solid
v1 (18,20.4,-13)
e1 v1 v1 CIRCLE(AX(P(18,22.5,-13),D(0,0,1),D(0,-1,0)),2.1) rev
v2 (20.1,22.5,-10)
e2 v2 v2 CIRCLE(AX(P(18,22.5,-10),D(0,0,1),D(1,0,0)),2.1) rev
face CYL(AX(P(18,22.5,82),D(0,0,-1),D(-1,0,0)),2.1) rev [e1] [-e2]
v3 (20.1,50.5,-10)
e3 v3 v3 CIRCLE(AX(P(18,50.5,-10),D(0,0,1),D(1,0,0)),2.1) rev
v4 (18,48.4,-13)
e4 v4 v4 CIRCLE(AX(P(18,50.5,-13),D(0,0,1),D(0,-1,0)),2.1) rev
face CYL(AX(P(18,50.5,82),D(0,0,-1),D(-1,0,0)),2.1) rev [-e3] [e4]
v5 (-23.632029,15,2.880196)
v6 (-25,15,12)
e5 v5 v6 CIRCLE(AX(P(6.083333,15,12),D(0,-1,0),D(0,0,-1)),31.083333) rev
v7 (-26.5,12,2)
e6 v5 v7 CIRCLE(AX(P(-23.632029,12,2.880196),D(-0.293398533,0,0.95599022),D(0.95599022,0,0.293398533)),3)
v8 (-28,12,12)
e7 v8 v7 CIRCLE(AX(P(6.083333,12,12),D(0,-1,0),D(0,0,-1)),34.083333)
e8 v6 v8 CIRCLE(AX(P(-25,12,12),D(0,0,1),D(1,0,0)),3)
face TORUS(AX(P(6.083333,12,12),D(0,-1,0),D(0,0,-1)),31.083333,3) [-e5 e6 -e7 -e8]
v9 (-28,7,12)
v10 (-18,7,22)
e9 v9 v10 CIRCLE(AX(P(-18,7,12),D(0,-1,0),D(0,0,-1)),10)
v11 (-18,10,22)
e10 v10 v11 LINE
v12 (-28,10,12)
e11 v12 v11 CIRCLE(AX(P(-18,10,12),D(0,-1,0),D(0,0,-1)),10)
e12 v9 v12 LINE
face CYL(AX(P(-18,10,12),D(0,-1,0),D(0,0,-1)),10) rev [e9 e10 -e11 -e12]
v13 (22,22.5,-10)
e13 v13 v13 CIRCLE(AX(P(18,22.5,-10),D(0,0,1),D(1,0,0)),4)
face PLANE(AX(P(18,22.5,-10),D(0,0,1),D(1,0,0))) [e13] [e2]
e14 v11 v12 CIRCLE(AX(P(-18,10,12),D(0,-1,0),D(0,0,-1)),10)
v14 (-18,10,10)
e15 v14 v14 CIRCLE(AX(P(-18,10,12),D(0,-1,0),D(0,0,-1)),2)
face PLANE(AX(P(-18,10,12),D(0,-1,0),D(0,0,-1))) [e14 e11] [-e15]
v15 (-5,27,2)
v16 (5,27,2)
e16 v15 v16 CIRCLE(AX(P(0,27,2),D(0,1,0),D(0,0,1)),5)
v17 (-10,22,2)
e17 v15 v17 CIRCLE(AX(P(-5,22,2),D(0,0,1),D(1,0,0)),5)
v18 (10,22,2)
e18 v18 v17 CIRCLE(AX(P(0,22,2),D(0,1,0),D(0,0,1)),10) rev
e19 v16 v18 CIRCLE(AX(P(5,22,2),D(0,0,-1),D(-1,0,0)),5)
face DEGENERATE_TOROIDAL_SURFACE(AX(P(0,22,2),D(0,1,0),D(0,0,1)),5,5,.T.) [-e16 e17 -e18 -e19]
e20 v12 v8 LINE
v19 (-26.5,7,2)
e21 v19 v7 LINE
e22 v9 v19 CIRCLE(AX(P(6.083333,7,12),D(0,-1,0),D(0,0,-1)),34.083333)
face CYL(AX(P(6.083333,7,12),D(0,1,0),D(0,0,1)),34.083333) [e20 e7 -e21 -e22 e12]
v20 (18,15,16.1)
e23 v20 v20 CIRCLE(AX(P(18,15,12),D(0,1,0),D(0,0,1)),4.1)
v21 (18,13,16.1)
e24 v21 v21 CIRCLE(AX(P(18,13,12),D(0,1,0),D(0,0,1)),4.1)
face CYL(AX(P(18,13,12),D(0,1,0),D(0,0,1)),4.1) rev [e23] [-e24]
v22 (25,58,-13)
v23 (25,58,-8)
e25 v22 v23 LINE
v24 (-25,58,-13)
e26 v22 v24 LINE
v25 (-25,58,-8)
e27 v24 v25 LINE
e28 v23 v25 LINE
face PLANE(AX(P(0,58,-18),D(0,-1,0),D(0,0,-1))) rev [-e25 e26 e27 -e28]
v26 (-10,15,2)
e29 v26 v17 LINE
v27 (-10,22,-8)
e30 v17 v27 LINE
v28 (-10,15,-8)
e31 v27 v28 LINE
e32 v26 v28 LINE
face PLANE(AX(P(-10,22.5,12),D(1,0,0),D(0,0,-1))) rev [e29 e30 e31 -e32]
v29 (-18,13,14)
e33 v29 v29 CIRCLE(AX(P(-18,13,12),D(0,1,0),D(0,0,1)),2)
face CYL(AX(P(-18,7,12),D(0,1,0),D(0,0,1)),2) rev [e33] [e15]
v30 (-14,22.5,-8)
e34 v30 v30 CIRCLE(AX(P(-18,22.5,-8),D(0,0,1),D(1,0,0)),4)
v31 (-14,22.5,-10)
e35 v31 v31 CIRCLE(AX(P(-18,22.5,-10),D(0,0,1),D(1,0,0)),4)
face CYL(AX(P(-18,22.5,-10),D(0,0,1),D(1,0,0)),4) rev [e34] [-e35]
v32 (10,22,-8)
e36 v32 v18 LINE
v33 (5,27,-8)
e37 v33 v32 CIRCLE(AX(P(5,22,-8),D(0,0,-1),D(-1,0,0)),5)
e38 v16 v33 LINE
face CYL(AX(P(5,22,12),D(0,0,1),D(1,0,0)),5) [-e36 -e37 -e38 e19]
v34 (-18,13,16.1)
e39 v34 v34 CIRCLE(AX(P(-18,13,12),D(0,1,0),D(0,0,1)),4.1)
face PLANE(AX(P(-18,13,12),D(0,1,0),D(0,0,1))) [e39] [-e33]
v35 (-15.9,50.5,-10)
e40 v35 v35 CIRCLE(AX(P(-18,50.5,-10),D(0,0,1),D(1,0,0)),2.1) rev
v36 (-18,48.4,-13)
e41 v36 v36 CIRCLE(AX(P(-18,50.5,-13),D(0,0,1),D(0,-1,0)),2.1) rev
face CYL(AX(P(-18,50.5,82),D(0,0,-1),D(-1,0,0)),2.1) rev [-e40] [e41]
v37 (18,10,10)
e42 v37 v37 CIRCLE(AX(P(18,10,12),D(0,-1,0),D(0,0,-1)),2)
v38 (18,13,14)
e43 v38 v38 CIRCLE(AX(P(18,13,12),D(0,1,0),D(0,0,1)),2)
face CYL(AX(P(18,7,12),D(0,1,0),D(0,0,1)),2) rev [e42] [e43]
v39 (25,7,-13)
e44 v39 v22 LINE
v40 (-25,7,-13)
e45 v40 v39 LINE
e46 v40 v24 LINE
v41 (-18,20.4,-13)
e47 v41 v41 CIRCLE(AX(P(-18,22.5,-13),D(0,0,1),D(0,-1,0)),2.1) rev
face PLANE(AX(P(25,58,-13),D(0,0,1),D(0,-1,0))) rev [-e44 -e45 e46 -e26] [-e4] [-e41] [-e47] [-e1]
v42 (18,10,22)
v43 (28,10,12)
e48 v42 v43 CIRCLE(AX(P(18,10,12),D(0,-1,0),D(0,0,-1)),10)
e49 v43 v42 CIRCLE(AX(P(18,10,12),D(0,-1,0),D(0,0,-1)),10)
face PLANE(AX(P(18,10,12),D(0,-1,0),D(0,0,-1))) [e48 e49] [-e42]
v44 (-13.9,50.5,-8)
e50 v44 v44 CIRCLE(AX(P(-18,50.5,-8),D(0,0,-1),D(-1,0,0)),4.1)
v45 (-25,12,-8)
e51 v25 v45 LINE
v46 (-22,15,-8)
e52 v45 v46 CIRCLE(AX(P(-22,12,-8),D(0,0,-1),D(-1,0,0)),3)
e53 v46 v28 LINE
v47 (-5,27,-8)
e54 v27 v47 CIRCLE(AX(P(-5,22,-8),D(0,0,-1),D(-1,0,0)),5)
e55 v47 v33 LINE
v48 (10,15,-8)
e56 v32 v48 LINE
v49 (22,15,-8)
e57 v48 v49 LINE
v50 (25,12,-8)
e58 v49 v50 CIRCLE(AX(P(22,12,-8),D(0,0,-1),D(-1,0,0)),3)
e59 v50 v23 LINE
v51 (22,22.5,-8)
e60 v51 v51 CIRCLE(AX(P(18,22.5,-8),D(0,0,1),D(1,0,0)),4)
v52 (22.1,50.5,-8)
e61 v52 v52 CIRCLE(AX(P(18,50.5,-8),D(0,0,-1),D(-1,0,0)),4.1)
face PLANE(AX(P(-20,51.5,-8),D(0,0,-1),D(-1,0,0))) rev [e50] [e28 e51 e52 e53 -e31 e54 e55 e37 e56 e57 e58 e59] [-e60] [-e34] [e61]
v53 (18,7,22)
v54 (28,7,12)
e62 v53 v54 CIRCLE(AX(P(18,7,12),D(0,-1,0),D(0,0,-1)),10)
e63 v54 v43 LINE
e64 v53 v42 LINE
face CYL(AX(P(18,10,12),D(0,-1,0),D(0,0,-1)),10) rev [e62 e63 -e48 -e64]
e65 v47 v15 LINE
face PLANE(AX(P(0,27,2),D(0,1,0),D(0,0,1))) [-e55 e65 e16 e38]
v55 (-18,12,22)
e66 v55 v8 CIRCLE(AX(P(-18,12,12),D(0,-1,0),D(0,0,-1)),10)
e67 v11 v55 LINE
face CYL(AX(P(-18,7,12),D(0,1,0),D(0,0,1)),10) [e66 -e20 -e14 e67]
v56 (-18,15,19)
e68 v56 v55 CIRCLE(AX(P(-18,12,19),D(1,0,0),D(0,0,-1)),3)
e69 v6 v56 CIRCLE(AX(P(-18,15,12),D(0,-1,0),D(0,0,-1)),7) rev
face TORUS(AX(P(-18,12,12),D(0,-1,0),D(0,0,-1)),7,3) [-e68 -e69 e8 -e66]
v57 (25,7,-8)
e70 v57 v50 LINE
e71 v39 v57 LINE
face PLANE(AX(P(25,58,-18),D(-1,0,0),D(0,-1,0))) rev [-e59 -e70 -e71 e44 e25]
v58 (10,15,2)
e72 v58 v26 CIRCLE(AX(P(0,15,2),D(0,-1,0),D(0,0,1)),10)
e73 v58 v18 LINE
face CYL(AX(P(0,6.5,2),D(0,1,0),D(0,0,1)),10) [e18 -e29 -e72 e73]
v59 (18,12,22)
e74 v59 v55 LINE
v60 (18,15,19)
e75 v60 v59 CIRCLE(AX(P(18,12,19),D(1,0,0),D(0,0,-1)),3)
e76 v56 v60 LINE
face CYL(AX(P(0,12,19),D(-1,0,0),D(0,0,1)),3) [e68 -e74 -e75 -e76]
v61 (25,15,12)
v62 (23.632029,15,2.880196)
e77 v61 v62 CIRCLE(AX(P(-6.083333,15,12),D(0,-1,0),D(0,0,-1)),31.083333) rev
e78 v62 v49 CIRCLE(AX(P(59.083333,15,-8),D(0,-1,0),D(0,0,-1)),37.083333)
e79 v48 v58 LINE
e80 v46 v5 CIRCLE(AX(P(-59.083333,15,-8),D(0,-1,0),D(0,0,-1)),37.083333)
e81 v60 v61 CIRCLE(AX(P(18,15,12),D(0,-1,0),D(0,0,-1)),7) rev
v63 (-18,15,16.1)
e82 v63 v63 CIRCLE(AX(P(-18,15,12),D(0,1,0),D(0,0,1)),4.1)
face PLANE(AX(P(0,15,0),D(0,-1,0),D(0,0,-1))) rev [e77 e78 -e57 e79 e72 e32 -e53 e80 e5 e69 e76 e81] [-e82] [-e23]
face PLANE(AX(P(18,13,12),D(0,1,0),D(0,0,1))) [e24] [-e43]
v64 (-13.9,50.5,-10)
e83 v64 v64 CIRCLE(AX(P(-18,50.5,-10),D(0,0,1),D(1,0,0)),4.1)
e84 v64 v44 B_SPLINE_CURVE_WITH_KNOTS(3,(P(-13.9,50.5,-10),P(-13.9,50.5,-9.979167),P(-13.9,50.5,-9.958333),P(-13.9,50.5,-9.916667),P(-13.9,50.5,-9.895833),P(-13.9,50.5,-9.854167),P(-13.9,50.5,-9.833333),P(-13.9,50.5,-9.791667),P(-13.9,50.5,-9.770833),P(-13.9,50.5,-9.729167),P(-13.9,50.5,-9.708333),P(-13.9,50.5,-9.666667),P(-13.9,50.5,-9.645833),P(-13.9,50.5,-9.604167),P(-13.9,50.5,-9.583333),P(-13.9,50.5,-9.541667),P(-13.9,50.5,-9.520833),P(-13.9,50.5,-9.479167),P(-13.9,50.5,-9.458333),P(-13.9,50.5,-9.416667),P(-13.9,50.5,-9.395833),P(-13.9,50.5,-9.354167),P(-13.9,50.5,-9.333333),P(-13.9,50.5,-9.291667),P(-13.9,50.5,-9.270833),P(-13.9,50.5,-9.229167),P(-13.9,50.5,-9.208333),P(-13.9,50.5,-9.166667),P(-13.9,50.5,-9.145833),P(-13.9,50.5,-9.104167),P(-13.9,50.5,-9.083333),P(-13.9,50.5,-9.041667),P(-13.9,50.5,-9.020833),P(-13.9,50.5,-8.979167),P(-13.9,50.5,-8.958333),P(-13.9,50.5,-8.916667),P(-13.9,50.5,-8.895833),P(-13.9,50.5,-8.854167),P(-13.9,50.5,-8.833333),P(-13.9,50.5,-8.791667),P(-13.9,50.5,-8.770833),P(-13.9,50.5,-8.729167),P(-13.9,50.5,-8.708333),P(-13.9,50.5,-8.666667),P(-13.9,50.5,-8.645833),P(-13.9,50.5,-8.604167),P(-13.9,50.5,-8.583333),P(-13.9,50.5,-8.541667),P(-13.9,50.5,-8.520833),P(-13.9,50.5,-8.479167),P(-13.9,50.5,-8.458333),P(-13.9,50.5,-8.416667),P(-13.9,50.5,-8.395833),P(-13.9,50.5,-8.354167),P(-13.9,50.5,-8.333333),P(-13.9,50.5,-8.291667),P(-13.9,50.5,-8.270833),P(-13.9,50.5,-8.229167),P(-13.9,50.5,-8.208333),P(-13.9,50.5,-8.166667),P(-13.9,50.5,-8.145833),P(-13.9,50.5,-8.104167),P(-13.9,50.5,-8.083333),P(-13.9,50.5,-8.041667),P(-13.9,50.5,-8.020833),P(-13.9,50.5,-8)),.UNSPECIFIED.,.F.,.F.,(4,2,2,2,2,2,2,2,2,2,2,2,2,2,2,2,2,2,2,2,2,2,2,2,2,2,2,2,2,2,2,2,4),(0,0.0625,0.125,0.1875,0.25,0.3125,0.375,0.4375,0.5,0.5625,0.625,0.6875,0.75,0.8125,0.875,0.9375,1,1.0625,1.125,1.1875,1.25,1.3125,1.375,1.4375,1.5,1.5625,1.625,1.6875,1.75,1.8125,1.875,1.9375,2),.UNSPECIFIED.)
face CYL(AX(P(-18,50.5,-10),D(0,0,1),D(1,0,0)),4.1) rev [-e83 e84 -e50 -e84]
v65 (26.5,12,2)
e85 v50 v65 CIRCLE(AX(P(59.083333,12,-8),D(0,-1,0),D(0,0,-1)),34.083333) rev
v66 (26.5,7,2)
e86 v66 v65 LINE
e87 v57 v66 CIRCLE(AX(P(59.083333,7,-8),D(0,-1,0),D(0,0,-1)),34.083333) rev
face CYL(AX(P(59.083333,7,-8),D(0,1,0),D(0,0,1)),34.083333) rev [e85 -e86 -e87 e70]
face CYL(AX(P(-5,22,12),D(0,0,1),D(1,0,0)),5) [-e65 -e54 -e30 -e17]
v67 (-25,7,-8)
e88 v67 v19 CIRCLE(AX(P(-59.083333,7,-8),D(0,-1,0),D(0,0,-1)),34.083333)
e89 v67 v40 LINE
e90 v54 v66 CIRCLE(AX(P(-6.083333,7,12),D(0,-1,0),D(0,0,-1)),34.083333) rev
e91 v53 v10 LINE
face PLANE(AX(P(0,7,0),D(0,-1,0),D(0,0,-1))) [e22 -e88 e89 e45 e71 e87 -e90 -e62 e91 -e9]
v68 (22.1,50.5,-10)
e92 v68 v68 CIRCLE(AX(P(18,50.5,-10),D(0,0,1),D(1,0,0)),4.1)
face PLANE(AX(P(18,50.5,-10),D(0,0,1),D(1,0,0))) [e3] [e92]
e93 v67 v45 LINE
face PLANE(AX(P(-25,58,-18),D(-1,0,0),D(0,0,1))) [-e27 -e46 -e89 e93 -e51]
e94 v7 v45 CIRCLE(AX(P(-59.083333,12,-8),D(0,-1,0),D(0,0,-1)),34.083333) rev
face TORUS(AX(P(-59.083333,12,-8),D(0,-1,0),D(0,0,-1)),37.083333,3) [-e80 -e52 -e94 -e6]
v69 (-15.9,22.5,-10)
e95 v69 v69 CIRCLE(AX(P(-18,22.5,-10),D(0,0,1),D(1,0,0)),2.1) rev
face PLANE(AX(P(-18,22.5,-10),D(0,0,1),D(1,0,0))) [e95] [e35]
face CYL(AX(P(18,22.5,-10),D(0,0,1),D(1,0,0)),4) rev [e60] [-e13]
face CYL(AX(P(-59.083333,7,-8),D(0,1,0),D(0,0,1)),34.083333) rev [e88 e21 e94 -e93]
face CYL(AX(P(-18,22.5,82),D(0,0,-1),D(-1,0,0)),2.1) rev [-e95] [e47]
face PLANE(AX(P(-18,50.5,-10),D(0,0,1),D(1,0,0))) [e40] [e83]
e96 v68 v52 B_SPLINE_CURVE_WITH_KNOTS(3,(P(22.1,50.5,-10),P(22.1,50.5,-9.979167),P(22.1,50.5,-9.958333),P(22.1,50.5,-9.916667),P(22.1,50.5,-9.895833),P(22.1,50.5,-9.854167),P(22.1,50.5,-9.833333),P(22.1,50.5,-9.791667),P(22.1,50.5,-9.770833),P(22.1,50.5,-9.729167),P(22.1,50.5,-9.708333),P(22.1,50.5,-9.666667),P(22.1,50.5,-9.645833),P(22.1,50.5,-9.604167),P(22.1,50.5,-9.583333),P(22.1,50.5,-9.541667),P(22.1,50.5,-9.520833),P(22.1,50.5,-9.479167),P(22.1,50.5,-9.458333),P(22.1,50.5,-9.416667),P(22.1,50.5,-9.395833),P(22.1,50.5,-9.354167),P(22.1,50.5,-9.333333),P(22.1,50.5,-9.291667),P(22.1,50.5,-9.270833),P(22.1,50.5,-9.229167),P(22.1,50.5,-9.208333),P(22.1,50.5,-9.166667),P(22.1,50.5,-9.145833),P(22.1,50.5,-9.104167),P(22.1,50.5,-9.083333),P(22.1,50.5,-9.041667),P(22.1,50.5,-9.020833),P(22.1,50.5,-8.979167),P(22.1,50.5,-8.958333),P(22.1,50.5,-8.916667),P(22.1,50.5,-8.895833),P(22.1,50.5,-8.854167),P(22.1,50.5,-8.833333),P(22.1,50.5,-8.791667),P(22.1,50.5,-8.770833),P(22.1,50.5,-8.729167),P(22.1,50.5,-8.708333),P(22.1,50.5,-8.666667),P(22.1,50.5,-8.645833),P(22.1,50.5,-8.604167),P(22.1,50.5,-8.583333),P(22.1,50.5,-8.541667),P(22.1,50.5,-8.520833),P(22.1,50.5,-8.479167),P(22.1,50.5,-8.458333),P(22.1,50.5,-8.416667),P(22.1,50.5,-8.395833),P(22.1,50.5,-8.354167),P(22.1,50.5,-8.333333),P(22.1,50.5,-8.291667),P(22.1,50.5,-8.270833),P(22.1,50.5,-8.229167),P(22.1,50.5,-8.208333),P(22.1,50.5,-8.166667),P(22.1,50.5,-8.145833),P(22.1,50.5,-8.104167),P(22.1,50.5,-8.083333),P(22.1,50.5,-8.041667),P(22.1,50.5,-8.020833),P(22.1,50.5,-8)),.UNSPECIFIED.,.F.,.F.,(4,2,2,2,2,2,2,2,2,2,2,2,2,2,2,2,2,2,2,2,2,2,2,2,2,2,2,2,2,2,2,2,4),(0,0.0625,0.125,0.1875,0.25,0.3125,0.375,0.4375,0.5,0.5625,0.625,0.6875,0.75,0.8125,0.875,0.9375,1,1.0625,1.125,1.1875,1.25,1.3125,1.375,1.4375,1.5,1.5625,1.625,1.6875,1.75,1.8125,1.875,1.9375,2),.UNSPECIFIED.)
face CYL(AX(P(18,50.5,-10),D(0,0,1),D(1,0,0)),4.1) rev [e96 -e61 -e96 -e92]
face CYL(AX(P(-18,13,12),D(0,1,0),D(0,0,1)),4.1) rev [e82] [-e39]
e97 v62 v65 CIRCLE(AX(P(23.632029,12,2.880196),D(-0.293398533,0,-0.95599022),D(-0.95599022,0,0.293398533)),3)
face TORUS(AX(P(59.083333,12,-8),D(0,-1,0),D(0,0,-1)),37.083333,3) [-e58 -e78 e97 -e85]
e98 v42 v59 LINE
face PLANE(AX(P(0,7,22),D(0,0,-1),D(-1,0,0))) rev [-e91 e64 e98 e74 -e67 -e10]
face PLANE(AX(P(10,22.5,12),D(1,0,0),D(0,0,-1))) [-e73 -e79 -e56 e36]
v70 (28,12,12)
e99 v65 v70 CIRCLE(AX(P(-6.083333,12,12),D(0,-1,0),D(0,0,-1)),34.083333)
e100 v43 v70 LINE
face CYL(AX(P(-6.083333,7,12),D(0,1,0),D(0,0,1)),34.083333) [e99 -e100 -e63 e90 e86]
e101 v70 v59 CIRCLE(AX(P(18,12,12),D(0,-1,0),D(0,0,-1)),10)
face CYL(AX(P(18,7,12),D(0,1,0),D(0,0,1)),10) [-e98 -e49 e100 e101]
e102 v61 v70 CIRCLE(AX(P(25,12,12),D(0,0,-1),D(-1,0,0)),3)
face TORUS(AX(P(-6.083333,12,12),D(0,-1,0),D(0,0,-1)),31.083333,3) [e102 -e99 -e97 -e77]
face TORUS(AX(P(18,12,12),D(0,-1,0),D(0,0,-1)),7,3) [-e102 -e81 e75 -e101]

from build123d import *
from build123d.topology import SkipClean

# Parameters (mm, degrees)
SKETCH_1_R           = 2
EXTRUDE_1_DEPTH      = 5
EXTRUDE_5_DEPTH      = 18
SKETCH_6_W           = 40
SKETCH_6_H           = 5
EXTRUDE_6_DEPTH      = 25
SKETCH_7_W           = 40
SKETCH_7_H           = 5
EXTRUDE_7_DEPTH      = 27
SKETCH_9_R           = 10
CUT_EXTRUDE_4_DEPTH  = 50
SKETCH_10_W          = 8
SKETCH_10_H          = 5
EXTRUDE_9_DEPTH      = 20
CUT_EXTRUDE_8_DEPTH  = 20
CUT_EXTRUDE_9_DEPTH  = 20
SKETCH_16_W          = 40
SKETCH_16_H          = 4
EXTRUDE_10_DEPTH     = 5
SKETCH_17_W          = 40
SKETCH_17_H          = 4
EXTRUDE_12_DEPTH     = 12
SKETCH_18_R          = 1.5
CUT_EXTRUDE_10_DEPTH = 10
CUT_EXTRUDE_11_DEPTH = 10
SKETCH_22_W          = 39.912411086
SKETCH_22_H          = 12
CUT_EXTRUDE_12_DEPTH = 10
SKETCH_23_W          = 1.771441315
SKETCH_23_H          = 1.605869394
CUT_EXTRUDE_13_DEPTH = 10
SKETCH_24_W          = 40
SKETCH_24_H          = 4
EXTRUDE_13_DEPTH     = 7
SKETCH_26_R          = 1.5
CUT_EXTRUDE_14_DEPTH = 7
SKETCH_27_W          = 8
SKETCH_27_H          = 26.5
EXTRUDE_14_DEPTH     = 5
SKETCH_28_W          = 8
SKETCH_28_H          = 25
EXTRUDE_15_DEPTH     = 5
SKETCH_30_W          = 8
SKETCH_30_H          = 1.5
CUT_EXTRUDE_15_DEPTH = 5
SKETCH_31_R          = 2.52
CUT_EXTRUDE_16_DEPTH = 5
SKETCH_32_R          = 2.52
CUT_EXTRUDE_17_DEPTH = 5
CUT_EXTRUDE_18_DEPTH = 5
SKETCH_2_R           = 4
CUT_EXTRUDE_19_DEPTH = 3
SKETCH_35_W          = 4
SKETCH_35_H          = 12
CUT_EXTRUDE_20_DEPTH = 100
SKETCH_37_W          = 50
SKETCH_37_H          = 43
CUT_EXTRUDE_21_DEPTH = 100
SKETCH_38_W          = 50
SKETCH_38_H          = 43
SKETCH_38_R          = 10
EXTRUDE_20_DEPTH     = 5
SKETCH_39_W          = 50
SKETCH_39_H          = 43
SKETCH_39_W_2        = 40
SKETCH_39_H_2        = 30
EXTRUDE_21_DEPTH     = 5
CUT_EXTRUDE_START    = -100
SKETCH_41_R          = 2.1
SKETCH_41_R_2        = 10
CUT_EXTRUDE_23_DEPTH = 100
SKETCH_42_W          = 6
SKETCH_42_H          = 5
CUT_EXTRUDE_24_DEPTH = 13
SKETCH_43_R          = 4.1
CUT_EXTRUDE_27_DEPTH = 29
EXTRUDE_START        = 27
EXTRUDE_22_DEPTH     = 27
EXTRUDE_23_DEPTH     = 27
SKETCH_46_W          = 28
SKETCH_46_H          = 0.25
EXTRUDE_24_DEPTH     = 20
SKETCH_47_R          = 4
CUT_EXTRUDE_28_DEPTH = 2
CUT_EXTRUDE_29_DEPTH = 10
CUT_EXTRUDE_30_DEPTH = 10
SKETCH_50_W          = 27
SKETCH_50_H          = 11.6
SKETCH_50_H_2        = 10.600731696
SKETCH_50_W_2        = 5
SKETCH_50_H_3        = 9.36628082
CUT_EXTRUDE_31_DEPTH = 60
SKETCH_51_R          = 10
SKETCH_51_W          = 5.257466337
SKETCH_51_H          = 20
SKETCH_51_W_2        = 5.257304599
EXTRUDE_25_DEPTH     = 10
SKETCH_52_W          = 5
SKETCH_52_H          = 43
CUT_EXTRUDE_32_DEPTH = 50
EXTRUDE_26_DEPTH     = 20
SKETCH_57_R          = 6.05
CUT_EXTRUDE_33_DEPTH = 20
EXTRUDE_START_2      = -12
EXTRUDE_27_DEPTH     = 12
SKETCH_62_R          = 2
EXTRUDE_28_DEPTH     = 8
CUT_EXTRUDE_START_2  = -3
SKETCH_63_R          = 10
CUT_EXTRUDE_34_DEPTH = 3
FILLET_1_R           = 5
FILLET_2_R           = 3
SKETCH_65_R          = 4.1
CUT_EXTRUDE_35_DEPTH = 2


with BuildPart() as part:
    # 草图1 → 凸台-拉伸1 (new body)
    with BuildSketch(Plane.XY):
        Polygon((0, 21.5), (25, 21.5), (25, -21.5), (-25, -21.5), (-25, 21.5), align=None)
        with Locations((-18, 14)):
            Circle(SKETCH_1_R, mode=Mode.SUBTRACT)
        with Locations((-18, -14)):
            Circle(SKETCH_1_R, mode=Mode.SUBTRACT)
        with Locations((18, -14)):
            Circle(SKETCH_1_R, mode=Mode.SUBTRACT)
        with Locations((18, 14)):
            Circle(SKETCH_1_R, mode=Mode.SUBTRACT)
    extrude(amount=EXTRUDE_1_DEPTH)

    # 草图5 → 凸台-拉伸5 (add)
    with BuildSketch(Plane.XY.offset(5)):
        Polygon((0, 26.5), (20, 26.5), (20, 21.5), (-20, 21.5), (-20, 26.5), align=None)
    extrude(amount=-EXTRUDE_5_DEPTH)

    # 草图6 → 凸台-拉伸6 (add)
    with BuildSketch(Plane(origin=(0, 26.5, 0), x_dir=(1, 0, 0), z_dir=(0, 1, 0))):
        with Locations((0, 10.5)):
            Rectangle(SKETCH_6_W, SKETCH_6_H)
    extrude(amount=EXTRUDE_6_DEPTH)

    # 草图7 → 凸台-拉伸7 (add)
    with BuildSketch(Plane.XY.offset(-8)):
        with Locations((0, 49)):
            Rectangle(SKETCH_7_W, SKETCH_7_H)
    extrude(amount=EXTRUDE_7_DEPTH)

    # 草图9 → 切除-拉伸4 (cut)
    with BuildSketch(Plane(origin=(0, 0, 0), x_dir=(-1, 0, 0), z_dir=(0, 0, -1))):
        Circle(SKETCH_9_R)
    extrude(amount=-CUT_EXTRUDE_4_DEPTH, mode=Mode.SUBTRACT)

    # 草图10 → 凸台-拉伸9 (add)
    with BuildSketch(Plane(origin=(0, 51.5, 0), x_dir=(1, 0, 0), z_dir=(0, 1, 0))):
        with Locations((-24, -16.5)):
            Rectangle(SKETCH_10_W, SKETCH_10_H)
        with Locations((24, -16.5)):
            Rectangle(SKETCH_10_W, SKETCH_10_H)
    extrude(amount=-EXTRUDE_9_DEPTH)

    # 草图12 → 切除-拉伸8 (cut)
    with BuildSketch(Plane(origin=(0, 0, 14), x_dir=(-1, 0, 0), z_dir=(0, 0, -1))):
        with BuildLine():
            Line((28, 46), (28, 47))
            Line((28, 47), (27.949489743, 47))
            ThreePointArc((27.949489743, 47), (23, 46.5), (27.949489743, 46))
            Line((27.949489743, 46), (28, 46))
        make_face()
        with BuildLine():
            Line((27.949489743, 36), (28, 36))
            Line((28, 36), (28, 37))
            Line((28, 37), (27.949489743, 37))
            ThreePointArc((27.949489743, 37), (23, 36.5), (27.949489743, 36))
        make_face()
    extrude(amount=-CUT_EXTRUDE_8_DEPTH, mode=Mode.SUBTRACT)

    # 草图15 → 切除-拉伸9 (cut)
    with BuildSketch(Plane(origin=(0, 0, 14), x_dir=(-1, 0, 0), z_dir=(0, 0, -1))):
        with BuildLine():
            ThreePointArc((-27.949489743, 46), (-23, 46.5), (-27.949489743, 47))
            Line((-27.949489743, 47), (-28, 47))
            Line((-28, 47), (-28, 46))
            Line((-28, 46), (-27.949489743, 46))
        make_face()
        with BuildLine():
            Line((-27.949489743, 37), (-28, 37))
            Line((-28, 37), (-28, 36))
            Line((-28, 36), (-27.949489743, 36))
            ThreePointArc((-27.949489743, 36), (-23, 36.5), (-27.949489743, 37))
        make_face()
    extrude(amount=-CUT_EXTRUDE_9_DEPTH, mode=Mode.SUBTRACT)

    # 草图16 → 凸台-拉伸10 (add)
    with BuildSketch(Plane(origin=(0, 51.5, 0), x_dir=(1, 0, 0), z_dir=(0, 1, 0))):
        with Locations((0, -21)):
            Rectangle(SKETCH_16_W, SKETCH_16_H)
    extrude(amount=-EXTRUDE_10_DEPTH)

    # 草图17 → 凸台-拉伸12 (add)
    with BuildSketch(Plane(origin=(0, 51.5, 0), x_dir=(1, 0, 0), z_dir=(0, 1, 0))):
        with Locations((0, -21)):
            Rectangle(SKETCH_17_W, SKETCH_17_H)
    extrude(amount=EXTRUDE_12_DEPTH)

    # 草图18 → 切除-拉伸10 (cut)
    with BuildSketch(Plane(origin=(0, 0, 19), x_dir=(-1, 0, 0), z_dir=(0, 0, -1))):
        with Locations((6, 59.5)):
            Circle(SKETCH_18_R)
        with Locations((13, 59.5)):
            Circle(SKETCH_18_R)
    extrude(amount=-CUT_EXTRUDE_10_DEPTH, mode=Mode.SUBTRACT)

    # 草图20 → 切除-拉伸11 (cut)
    with BuildSketch(Plane.XY.offset(23)):
        with BuildLine():
            ThreePointArc((8, 63.5), (16.485281374, 59.985281374), (20, 51.5))
            Line((20, 51.5), (20, 63.5))
            Line((20, 63.5), (8, 63.5))
        make_face()
    extrude(amount=-CUT_EXTRUDE_11_DEPTH, mode=Mode.SUBTRACT)

    # 草图22 → 切除-拉伸12 (cut)
    with BuildSketch(Plane.XY.offset(23)):
        with Locations((-0.043794457, 57.5)):
            Rectangle(SKETCH_22_W, SKETCH_22_H)
    extrude(amount=-CUT_EXTRUDE_12_DEPTH, mode=Mode.SUBTRACT)

    # 草图23 → 切除-拉伸13 (cut)
    with BuildSketch(Plane.XY.offset(23)):
        with Locations((20.269466875, 52.302934697)):
            Rectangle(SKETCH_23_W, SKETCH_23_H)
    extrude(amount=-CUT_EXTRUDE_13_DEPTH, mode=Mode.SUBTRACT)

    # 草图24 → 凸台-拉伸13 (add)
    with BuildSketch(Plane(origin=(0, 51.5, 0), x_dir=(1, 0, 0), z_dir=(0, 1, 0))):
        with Locations((0, -21)):
            Rectangle(SKETCH_24_W, SKETCH_24_H)
    extrude(amount=EXTRUDE_13_DEPTH)

    # 草图26 → 切除-拉伸14 (cut)
    with BuildSketch(Plane.XY.offset(23)):
        with Locations((-13, 54.5)):
            Circle(SKETCH_26_R)
        with Locations((-6, 54.5)):
            Circle(SKETCH_26_R)
    extrude(amount=-CUT_EXTRUDE_14_DEPTH, mode=Mode.SUBTRACT)

    # 草图27 → 凸台-拉伸14 (add)
    with BuildSketch(Plane.XY.offset(19)):
        with Locations((24, 38.25)):
            Rectangle(SKETCH_27_W, SKETCH_27_H)
    extrude(amount=-EXTRUDE_14_DEPTH)

    # 草图28 → 凸台-拉伸15 (add)
    with BuildSketch(Plane.XY.offset(19)):
        with Locations((-24, 39)):
            Rectangle(SKETCH_28_W, SKETCH_28_H)
    extrude(amount=-EXTRUDE_15_DEPTH)

    # 草图30 → 切除-拉伸15 (cut)
    with BuildSketch(Plane.XY.offset(19)):
        with Locations((24, 25.75)):
            Rectangle(SKETCH_30_W, SKETCH_30_H)
    extrude(amount=-CUT_EXTRUDE_15_DEPTH, mode=Mode.SUBTRACT)

    # 草图31 → 切除-拉伸16 (cut)
    with BuildSketch(Plane.XY.offset(19)):
        with Locations((25.5, 41.5)):
            Circle(SKETCH_31_R)
        with Locations((25.5, 31.5)):
            Circle(SKETCH_31_R)
    extrude(amount=-CUT_EXTRUDE_16_DEPTH, mode=Mode.SUBTRACT)

    # 草图32 → 切除-拉伸17 (cut)
    with BuildSketch(Plane.XY.offset(19)):
        with Locations((-25.5, 41.5)):
            Circle(SKETCH_32_R)
        with Locations((-25.5, 31.5)):
            Circle(SKETCH_32_R)
    extrude(amount=-CUT_EXTRUDE_17_DEPTH, mode=Mode.SUBTRACT)

    # 草图33 → 切除-拉伸18 (cut)
    with BuildSketch(Plane(origin=(0, 0, 19), x_dir=(-1, 0, 0), z_dir=(0, 0, -1))):
        with BuildLine():
            Line((-20, 58.5), (-20, 51.5))
            ThreePointArc((-20, 51.5), (-17.949747468, 56.449747468), (-13, 58.5))
            Line((-13, 58.5), (-20, 58.5))
        make_face()
        with BuildLine():
            Line((20, 58.5), (13, 58.5))
            ThreePointArc((13, 58.5), (17.949747468, 56.449747468), (20, 51.5))
            Line((20, 51.5), (20, 58.5))
        make_face()
    extrude(amount=-CUT_EXTRUDE_18_DEPTH, mode=Mode.SUBTRACT)

    # 草图2 → 切除-拉伸19 (cut)
    with BuildSketch(Plane.XY.offset(5)):
        with Locations((18, 14)):
            Circle(SKETCH_2_R)
        with Locations((-18, 14)):
            Circle(SKETCH_2_R)
        with Locations((-18, -14)):
            Circle(SKETCH_2_R)
        with Locations((18, -14)):
            Circle(SKETCH_2_R)
    extrude(amount=-CUT_EXTRUDE_19_DEPTH, mode=Mode.SUBTRACT)

    # 草图35 → 切除-拉伸20 (cut)
    with BuildSketch(Plane.ZY.offset(20)):
        with Locations((21, 52.5)):
            Rectangle(SKETCH_35_W, SKETCH_35_H)
    extrude(amount=-CUT_EXTRUDE_20_DEPTH, mode=Mode.SUBTRACT)

    # 草图37 → 切除-拉伸21 (cut)
    with BuildSketch(Plane.XY.offset(5)):
        Rectangle(SKETCH_37_W, SKETCH_37_H)
    extrude(amount=-CUT_EXTRUDE_21_DEPTH, mode=Mode.SUBTRACT)

    # 草图38 → 凸台-拉伸20 (add)
    with BuildSketch(Plane(origin=(0, 0, -13), x_dir=(-1, 0, 0), z_dir=(0, 0, -1))):
        with Locations((0, 36.5)):
            Rectangle(SKETCH_38_W, SKETCH_38_H)
        with Locations((0, 36.5)):
            Circle(SKETCH_38_R, mode=Mode.SUBTRACT)
    extrude(amount=EXTRUDE_20_DEPTH)

    # 草图39 → 凸台-拉伸21 (add)
    with BuildSketch(Plane.XY.offset(-13)):
        with Locations((0, 36.5)):
            Rectangle(SKETCH_39_W, SKETCH_39_H)
        with Locations((0, 36.5)):
            Rectangle(SKETCH_39_W_2, SKETCH_39_H_2, mode=Mode.SUBTRACT)
    extrude(amount=EXTRUDE_21_DEPTH)

    # 草图41 → 切除-拉伸23 (cut)
    with BuildSketch(Plane(origin=(0, 0, -18), x_dir=(-1, 0, 0), z_dir=(0, 0, -1)).offset(CUT_EXTRUDE_START)):
        with Locations((-18, 50.5)):
            Circle(SKETCH_41_R)
        with Locations((18, 50.5)):
            Circle(SKETCH_41_R)
        with Locations((18, 22.5)):
            Circle(SKETCH_41_R)
        with Locations((-18, 22.5)):
            Circle(SKETCH_41_R)
        with Locations(Location((0, 36.5, 0), (0, 0, 270))):
            Circle(SKETCH_41_R_2)
    extrude(amount=CUT_EXTRUDE_23_DEPTH, mode=Mode.SUBTRACT)

    # 草图42 → 切除-拉伸24 (cut)
    with BuildSketch(Plane.XY.offset(5)):
        with Locations((-17, 24)):
            Rectangle(SKETCH_42_W, SKETCH_42_H)
        with Locations((17, 24)):
            Rectangle(SKETCH_42_W, SKETCH_42_H)
    extrude(amount=-CUT_EXTRUDE_24_DEPTH, mode=Mode.SUBTRACT)

    # 草图43 → 切除-拉伸27 (cut)
    with BuildSketch(Plane.XY.offset(19)):
        with Locations((-18, 50.5)):
            Circle(SKETCH_43_R)
        with Locations((18, 50.5)):
            Circle(SKETCH_43_R)
    extrude(amount=-CUT_EXTRUDE_27_DEPTH, mode=Mode.SUBTRACT)

    # 草图44 → 凸台-拉伸22 (add)
    with SkipClean():  # the faces are left unmerged after this step: merging them gives an invalid solid
        with BuildSketch(Plane.XY.offset(-8).offset(EXTRUDE_START)):
            with BuildLine():
                Line((-25, 46.5), (-20, 46.5))
                Line((-20, 46.5), (-20, 46.920893966))
                ThreePointArc((-20, 46.920893966), (-22.1, 50.5), (-20, 54.079106034))
                Line((-20, 54.079106034), (-20, 58))
                Line((-20, 58), (-25, 58))
                Line((-25, 58), (-25, 46.5))
            make_face()
        extrude(amount=-EXTRUDE_22_DEPTH)

    # 草图45 → 凸台-拉伸23 (add)
    with SkipClean():  # the faces are left unmerged after this step: merging them gives an invalid solid
        with BuildSketch(Plane.XY.offset(-8).offset(EXTRUDE_START)):
            with BuildLine():
                Line((18.9, 46.5), (25, 46.5))
                Line((25, 46.5), (25, 58))
                Line((25, 58), (20, 58))
                Line((20, 58), (20, 54.079106034))
                ThreePointArc((20, 54.079106034), (22.057488307, 49.911112372), (18.9, 46.5))
            make_face()
        extrude(amount=-EXTRUDE_23_DEPTH)

    # 草图46 → 凸台-拉伸24 (add)
    with SkipClean():  # the faces are left unmerged after this step: merging them gives an invalid solid
        with BuildSketch(Plane.XY.offset(5)):
            with Locations((0, 26.625)):
                Rectangle(SKETCH_46_W, SKETCH_46_H)
        extrude(amount=-EXTRUDE_24_DEPTH)

    # 草图47 → 切除-拉伸28 (cut)
    with SkipClean():  # the faces are left unmerged after this step: merging them gives an invalid solid
        with BuildSketch(Plane.XY.offset(-8)):
            with Locations((-18, 22.5)):
                Circle(SKETCH_47_R)
            with Locations((18, 22.5)):
                Circle(SKETCH_47_R)
        extrude(amount=-CUT_EXTRUDE_28_DEPTH, mode=Mode.SUBTRACT)

    # 草图48 → 切除-拉伸29 (cut)
    with SkipClean():  # the faces are left unmerged after this step: merging them gives an invalid solid
        with BuildSketch(Plane.XY.offset(-8)):
            with BuildLine():
                Line((-25, 46.5), (-25, 26.5))
                ThreePointArc((-25, 26.5), (-19.999999498, 36.5), (-25, 46.5))
            make_face()
        extrude(amount=-CUT_EXTRUDE_29_DEPTH, mode=Mode.SUBTRACT)

    # 草图49 → 切除-拉伸30 (cut)
    with SkipClean():  # the faces are left unmerged after this step: merging them gives an invalid solid
        with BuildSketch(Plane.XY.offset(-8)):
            with BuildLine():
                Line((25, 46.5), (25, 26.5))
                ThreePointArc((25, 26.5), (20, 36.5), (25, 46.5))
            make_face()
        extrude(amount=-CUT_EXTRUDE_30_DEPTH, mode=Mode.SUBTRACT)

    # 草图50 → 切除-拉伸31 (cut)
    with BuildSketch(Plane.ZY.offset(28)):
        with Locations((5.5, 52.2)):
            Rectangle(SKETCH_50_W, SKETCH_50_H)
        Polygon((-8, 26.5), (19, 26.5), (19, 31.81685959), (14, 31.81685959), (14, 41.18314041), (19, 41.18314041), (19, 46.4), (-8, 46.4), align=None)
        with Locations((5.5, 21.199634152)):
            Rectangle(SKETCH_50_W, SKETCH_50_H_2)
        with Locations((16.5, 36.5)):
            Rectangle(SKETCH_50_W_2, SKETCH_50_H_3)
    extrude(amount=-CUT_EXTRUDE_31_DEPTH, mode=Mode.SUBTRACT)

    # 草图51 → 凸台-拉伸25 (add)
    with BuildSketch(Plane.XY.offset(-8)):
        with Locations((0, 36.5)):
            Circle(SKETCH_51_R)
        with Locations((-22.371266832, 36.5)):
            Rectangle(SKETCH_51_W, SKETCH_51_H)
        with Locations((22.371347701, 36.5)):
            Rectangle(SKETCH_51_W_2, SKETCH_51_H)
    extrude(amount=-EXTRUDE_25_DEPTH)

    # 草图52 → 切除-拉伸32 (cut)
    with BuildSketch(Plane.ZY.offset(25)):
        with Locations((-15.5, 36.5)):
            Rectangle(SKETCH_52_W, SKETCH_52_H)
    extrude(amount=-CUT_EXTRUDE_32_DEPTH, mode=Mode.SUBTRACT)

    # 草图53 → 凸台-拉伸26 (add)
    with BuildSketch(Plane.XY.offset(-8)):
        Polygon((-10, 22.5), (-10, 26.5), (10, 26.5), (10, 22.5), (10, 18.5), (-10, 18.5), align=None)
    extrude(amount=EXTRUDE_26_DEPTH)

    # 草图57 → 切除-拉伸33 (cut)
    with BuildSketch(Plane(origin=(0, 26.5, 0), x_dir=(1, 0, 0), z_dir=(0, 1, 0))):
        with Locations(Location((0, -2, 0), (0, 0, 270))):
            Circle(SKETCH_57_R)
        with BuildLine():
            ThreePointArc((0, -12), (-7.071067812, -9.071067812), (-10, -2))
            Line((-10, -2), (-10, -12))
            Line((-10, -12), (0, -12))
        make_face()
        with BuildLine():
            ThreePointArc((10, -2), (7.071067812, -9.071067812), (0, -12))
            Line((0, -12), (10, -12))
            Line((10, -12), (10, -2))
        make_face()
    extrude(amount=-CUT_EXTRUDE_33_DEPTH, mode=Mode.SUBTRACT)

    # 草图58 → 凸台-拉伸27 (add)
    with SkipClean():  # the faces are left unmerged after this step: merging them gives an invalid solid
        with BuildSketch(Plane.XZ.offset(-15).offset(EXTRUDE_START_2)):
            with BuildLine():
                Line((-10, -8), (-10, 2))
                ThreePointArc((-10, 2), (0, 12), (10, 2))
                Line((10, 2), (10, -8))
                Line((10, -8), (-10, -8))
            make_face()
        extrude(amount=EXTRUDE_27_DEPTH)
    add(part.part.scale(1), mode=Mode.REPLACE)  # the faces are merged on a copy

    # 草图62 → 凸台-拉伸28 (add)
    # profile 1 of 2: a face of its own
    with BuildSketch(Plane.XZ.offset(-15)):
        with BuildLine():
            ThreePointArc((25, -8), (25.377085973, -2.944062896), (26.5, 2))
            ThreePointArc((26.5, 2), (27.622914027, 6.944062896), (28, 12))
            ThreePointArc((28, 12), (25.071067812, 19.071067812), (18, 22))
            Line((18, 22), (-18, 22))
            ThreePointArc((-18, 22), (-25.071067812, 19.071067812), (-28, 12))
            ThreePointArc((-28, 12), (-27.622914027, 6.944062896), (-26.5, 2))
            ThreePointArc((-26.5, 2), (-25.377085973, -2.944062896), (-25, -8))
            Line((-25, -8), (-10, -8))
            Line((-10, -8), (-10, 2))
            ThreePointArc((-10, 2), (0, 12), (10, 2))
            Line((10, 2), (10, -8))
            Line((10, -8), (25, -8))
        make_face()
        with Locations(Location((-18, 12, 0), (0, 0, 270))):
            Circle(SKETCH_62_R, mode=Mode.SUBTRACT)
        with Locations(Location((18, 12, 0), (0, 0, 270))):
            Circle(SKETCH_62_R, mode=Mode.SUBTRACT)
    # profile 2 of 2: a face of its own
    with BuildSketch(Plane.XZ.offset(-15)):
        with BuildLine():
            Line((-10, -8), (-25, -8))
            Line((-25, -8), (-25, -13))
            Line((-25, -13), (25, -13))
            Line((25, -13), (25, -8))
            Line((25, -8), (10, -8))
            Line((10, -8), (10, 2))
            ThreePointArc((10, 2), (0, 12), (-10, 2))
            Line((-10, 2), (-10, -8))
        make_face()
    extrude(amount=EXTRUDE_28_DEPTH)

    # 草图63 → 切除-拉伸34 (cut)
    with BuildSketch(Plane.XZ.offset(-7).offset(CUT_EXTRUDE_START_2)):
        with Locations((-18, 12)):
            Circle(SKETCH_63_R)
        with Locations((18, 12)):
            Circle(SKETCH_63_R)
    extrude(amount=CUT_EXTRUDE_34_DEPTH, mode=Mode.SUBTRACT)

    # 圆角1
    fillet_1_edges = [part.edges().sort_by_distance(p)[0] for p in [
        (0, 27, 12),
        (-10, 27, -3),
        (10, 27, -3),
    ]]
    fillet(fillet_1_edges, radius=FILLET_1_R)

    # 圆角2
    # the kernel refuses this fillet: 3 mm, written as the material it takes off along each edge
    with BuildSketch(Plane(origin=(59.083333333, 15, -8), x_dir=(-1, 0, 0), z_dir=(0, 0, -1))) as fillet_2_piece_1:
        with BuildLine():
            CenterArc((34.083333333 + FILLET_2_R, -FILLET_2_R), FILLET_2_R, 90, 90)
            Line((34.083333333, -FILLET_2_R), (34.083333333, 0))
            Line((34.083333333, 0), (34.083333333 + FILLET_2_R, 0))
        make_face()
    revolve(axis=Axis((59.083333333, 15, -8), (0, 1, 0)), revolution_arc=17.06153122, mode=Mode.SUBTRACT)
    with BuildSketch(Plane(origin=(18, 15, 22), x_dir=(0, 0, -1), z_dir=(-1, 0, 0))) as fillet_2_piece_2:
        with BuildLine():
            CenterArc((FILLET_2_R, FILLET_2_R), FILLET_2_R, 180, 90)
            Line((0, FILLET_2_R), (0, 0))
            Line((0, 0), (FILLET_2_R, 0))
        make_face()
    extrude(amount=36, mode=Mode.SUBTRACT)
    with BuildSketch(Plane(origin=(-18, 15, 12), x_dir=(0, 0, 1), z_dir=(1, 0, 0))) as fillet_2_piece_3:
        with BuildLine():
            CenterArc((10 - FILLET_2_R, FILLET_2_R), FILLET_2_R, 270, 90)
            Line((10, FILLET_2_R), (10, 0))
            Line((10, 0), (10 - FILLET_2_R, 0))
        make_face()
    revolve(axis=Axis((-18, 15, 12), (0, -1, 0)), revolution_arc=90, mode=Mode.SUBTRACT)
    with BuildSketch(Plane(origin=(6.083333333, 15, 12), x_dir=(-1, 0, 0), z_dir=(0, 0, 1))) as fillet_2_piece_4:
        with BuildLine():
            CenterArc((34.083333333 - FILLET_2_R, FILLET_2_R), FILLET_2_R, 270, 90)
            Line((34.083333333, FILLET_2_R), (34.083333333, 0))
            Line((34.083333333, 0), (34.083333333 - FILLET_2_R, 0))
        make_face()
    revolve(axis=Axis((6.083333333, 15, 12), (0, -1, 0)), revolution_arc=17.06153122, mode=Mode.SUBTRACT)
    with BuildSketch(Plane(origin=(-59.083333333, 15, -8), x_dir=(0.9559902200488997, 0, 0.2933985330073357), z_dir=(-0.2933985330073357, 0, 0.9559902200488997))) as fillet_2_piece_5:
        with BuildLine():
            CenterArc((34.083333333 + FILLET_2_R, -FILLET_2_R), FILLET_2_R, 90, 90)
            Line((34.083333333, -FILLET_2_R), (34.083333333, 0))
            Line((34.083333333, 0), (34.083333333 + FILLET_2_R, 0))
        make_face()
    revolve(axis=Axis((-59.083333333, 15, -8), (0, 1, 0)), revolution_arc=17.06153122, mode=Mode.SUBTRACT)
    with BuildSketch(Plane(origin=(18, 15, 12), x_dir=(1, 0, 0), z_dir=(0, 0, -1))) as fillet_2_piece_6:
        with BuildLine():
            CenterArc((10 - FILLET_2_R, FILLET_2_R), FILLET_2_R, 270, 90)
            Line((10, FILLET_2_R), (10, 0))
            Line((10, 0), (10 - FILLET_2_R, 0))
        make_face()
    revolve(axis=Axis((18, 15, 12), (0, -1, 0)), revolution_arc=90, mode=Mode.SUBTRACT)
    with BuildSketch(Plane(origin=(-6.083333333, 15, 12), x_dir=(0.955990220048899, 0, -0.2933985330073376), z_dir=(-0.2933985330073376, 0, -0.955990220048899))) as fillet_2_piece_7:
        with BuildLine():
            CenterArc((34.083333333 - FILLET_2_R, FILLET_2_R), FILLET_2_R, 270, 90)
            Line((34.083333333, FILLET_2_R), (34.083333333, 0))
            Line((34.083333333, 0), (34.083333333 - FILLET_2_R, 0))
        make_face()
    revolve(axis=Axis((-6.083333333, 15, 12), (0, -1, 0)), revolution_arc=17.06153122, mode=Mode.SUBTRACT)

    # 草图65 → 切除-拉伸35 (cut)
    with BuildSketch(Plane(origin=(0, 15, 0), x_dir=(1, 0, 0), z_dir=(0, 1, 0))):
        with Locations(Location((-18, -12, 0), (0, 0, 270))):
            Circle(SKETCH_65_R)
        with Locations(Location((18, -12, 0), (0, 0, 270))):
            Circle(SKETCH_65_R)
    extrude(amount=-CUT_EXTRUDE_35_DEPTH, mode=Mode.SUBTRACT)


solid = part.part
